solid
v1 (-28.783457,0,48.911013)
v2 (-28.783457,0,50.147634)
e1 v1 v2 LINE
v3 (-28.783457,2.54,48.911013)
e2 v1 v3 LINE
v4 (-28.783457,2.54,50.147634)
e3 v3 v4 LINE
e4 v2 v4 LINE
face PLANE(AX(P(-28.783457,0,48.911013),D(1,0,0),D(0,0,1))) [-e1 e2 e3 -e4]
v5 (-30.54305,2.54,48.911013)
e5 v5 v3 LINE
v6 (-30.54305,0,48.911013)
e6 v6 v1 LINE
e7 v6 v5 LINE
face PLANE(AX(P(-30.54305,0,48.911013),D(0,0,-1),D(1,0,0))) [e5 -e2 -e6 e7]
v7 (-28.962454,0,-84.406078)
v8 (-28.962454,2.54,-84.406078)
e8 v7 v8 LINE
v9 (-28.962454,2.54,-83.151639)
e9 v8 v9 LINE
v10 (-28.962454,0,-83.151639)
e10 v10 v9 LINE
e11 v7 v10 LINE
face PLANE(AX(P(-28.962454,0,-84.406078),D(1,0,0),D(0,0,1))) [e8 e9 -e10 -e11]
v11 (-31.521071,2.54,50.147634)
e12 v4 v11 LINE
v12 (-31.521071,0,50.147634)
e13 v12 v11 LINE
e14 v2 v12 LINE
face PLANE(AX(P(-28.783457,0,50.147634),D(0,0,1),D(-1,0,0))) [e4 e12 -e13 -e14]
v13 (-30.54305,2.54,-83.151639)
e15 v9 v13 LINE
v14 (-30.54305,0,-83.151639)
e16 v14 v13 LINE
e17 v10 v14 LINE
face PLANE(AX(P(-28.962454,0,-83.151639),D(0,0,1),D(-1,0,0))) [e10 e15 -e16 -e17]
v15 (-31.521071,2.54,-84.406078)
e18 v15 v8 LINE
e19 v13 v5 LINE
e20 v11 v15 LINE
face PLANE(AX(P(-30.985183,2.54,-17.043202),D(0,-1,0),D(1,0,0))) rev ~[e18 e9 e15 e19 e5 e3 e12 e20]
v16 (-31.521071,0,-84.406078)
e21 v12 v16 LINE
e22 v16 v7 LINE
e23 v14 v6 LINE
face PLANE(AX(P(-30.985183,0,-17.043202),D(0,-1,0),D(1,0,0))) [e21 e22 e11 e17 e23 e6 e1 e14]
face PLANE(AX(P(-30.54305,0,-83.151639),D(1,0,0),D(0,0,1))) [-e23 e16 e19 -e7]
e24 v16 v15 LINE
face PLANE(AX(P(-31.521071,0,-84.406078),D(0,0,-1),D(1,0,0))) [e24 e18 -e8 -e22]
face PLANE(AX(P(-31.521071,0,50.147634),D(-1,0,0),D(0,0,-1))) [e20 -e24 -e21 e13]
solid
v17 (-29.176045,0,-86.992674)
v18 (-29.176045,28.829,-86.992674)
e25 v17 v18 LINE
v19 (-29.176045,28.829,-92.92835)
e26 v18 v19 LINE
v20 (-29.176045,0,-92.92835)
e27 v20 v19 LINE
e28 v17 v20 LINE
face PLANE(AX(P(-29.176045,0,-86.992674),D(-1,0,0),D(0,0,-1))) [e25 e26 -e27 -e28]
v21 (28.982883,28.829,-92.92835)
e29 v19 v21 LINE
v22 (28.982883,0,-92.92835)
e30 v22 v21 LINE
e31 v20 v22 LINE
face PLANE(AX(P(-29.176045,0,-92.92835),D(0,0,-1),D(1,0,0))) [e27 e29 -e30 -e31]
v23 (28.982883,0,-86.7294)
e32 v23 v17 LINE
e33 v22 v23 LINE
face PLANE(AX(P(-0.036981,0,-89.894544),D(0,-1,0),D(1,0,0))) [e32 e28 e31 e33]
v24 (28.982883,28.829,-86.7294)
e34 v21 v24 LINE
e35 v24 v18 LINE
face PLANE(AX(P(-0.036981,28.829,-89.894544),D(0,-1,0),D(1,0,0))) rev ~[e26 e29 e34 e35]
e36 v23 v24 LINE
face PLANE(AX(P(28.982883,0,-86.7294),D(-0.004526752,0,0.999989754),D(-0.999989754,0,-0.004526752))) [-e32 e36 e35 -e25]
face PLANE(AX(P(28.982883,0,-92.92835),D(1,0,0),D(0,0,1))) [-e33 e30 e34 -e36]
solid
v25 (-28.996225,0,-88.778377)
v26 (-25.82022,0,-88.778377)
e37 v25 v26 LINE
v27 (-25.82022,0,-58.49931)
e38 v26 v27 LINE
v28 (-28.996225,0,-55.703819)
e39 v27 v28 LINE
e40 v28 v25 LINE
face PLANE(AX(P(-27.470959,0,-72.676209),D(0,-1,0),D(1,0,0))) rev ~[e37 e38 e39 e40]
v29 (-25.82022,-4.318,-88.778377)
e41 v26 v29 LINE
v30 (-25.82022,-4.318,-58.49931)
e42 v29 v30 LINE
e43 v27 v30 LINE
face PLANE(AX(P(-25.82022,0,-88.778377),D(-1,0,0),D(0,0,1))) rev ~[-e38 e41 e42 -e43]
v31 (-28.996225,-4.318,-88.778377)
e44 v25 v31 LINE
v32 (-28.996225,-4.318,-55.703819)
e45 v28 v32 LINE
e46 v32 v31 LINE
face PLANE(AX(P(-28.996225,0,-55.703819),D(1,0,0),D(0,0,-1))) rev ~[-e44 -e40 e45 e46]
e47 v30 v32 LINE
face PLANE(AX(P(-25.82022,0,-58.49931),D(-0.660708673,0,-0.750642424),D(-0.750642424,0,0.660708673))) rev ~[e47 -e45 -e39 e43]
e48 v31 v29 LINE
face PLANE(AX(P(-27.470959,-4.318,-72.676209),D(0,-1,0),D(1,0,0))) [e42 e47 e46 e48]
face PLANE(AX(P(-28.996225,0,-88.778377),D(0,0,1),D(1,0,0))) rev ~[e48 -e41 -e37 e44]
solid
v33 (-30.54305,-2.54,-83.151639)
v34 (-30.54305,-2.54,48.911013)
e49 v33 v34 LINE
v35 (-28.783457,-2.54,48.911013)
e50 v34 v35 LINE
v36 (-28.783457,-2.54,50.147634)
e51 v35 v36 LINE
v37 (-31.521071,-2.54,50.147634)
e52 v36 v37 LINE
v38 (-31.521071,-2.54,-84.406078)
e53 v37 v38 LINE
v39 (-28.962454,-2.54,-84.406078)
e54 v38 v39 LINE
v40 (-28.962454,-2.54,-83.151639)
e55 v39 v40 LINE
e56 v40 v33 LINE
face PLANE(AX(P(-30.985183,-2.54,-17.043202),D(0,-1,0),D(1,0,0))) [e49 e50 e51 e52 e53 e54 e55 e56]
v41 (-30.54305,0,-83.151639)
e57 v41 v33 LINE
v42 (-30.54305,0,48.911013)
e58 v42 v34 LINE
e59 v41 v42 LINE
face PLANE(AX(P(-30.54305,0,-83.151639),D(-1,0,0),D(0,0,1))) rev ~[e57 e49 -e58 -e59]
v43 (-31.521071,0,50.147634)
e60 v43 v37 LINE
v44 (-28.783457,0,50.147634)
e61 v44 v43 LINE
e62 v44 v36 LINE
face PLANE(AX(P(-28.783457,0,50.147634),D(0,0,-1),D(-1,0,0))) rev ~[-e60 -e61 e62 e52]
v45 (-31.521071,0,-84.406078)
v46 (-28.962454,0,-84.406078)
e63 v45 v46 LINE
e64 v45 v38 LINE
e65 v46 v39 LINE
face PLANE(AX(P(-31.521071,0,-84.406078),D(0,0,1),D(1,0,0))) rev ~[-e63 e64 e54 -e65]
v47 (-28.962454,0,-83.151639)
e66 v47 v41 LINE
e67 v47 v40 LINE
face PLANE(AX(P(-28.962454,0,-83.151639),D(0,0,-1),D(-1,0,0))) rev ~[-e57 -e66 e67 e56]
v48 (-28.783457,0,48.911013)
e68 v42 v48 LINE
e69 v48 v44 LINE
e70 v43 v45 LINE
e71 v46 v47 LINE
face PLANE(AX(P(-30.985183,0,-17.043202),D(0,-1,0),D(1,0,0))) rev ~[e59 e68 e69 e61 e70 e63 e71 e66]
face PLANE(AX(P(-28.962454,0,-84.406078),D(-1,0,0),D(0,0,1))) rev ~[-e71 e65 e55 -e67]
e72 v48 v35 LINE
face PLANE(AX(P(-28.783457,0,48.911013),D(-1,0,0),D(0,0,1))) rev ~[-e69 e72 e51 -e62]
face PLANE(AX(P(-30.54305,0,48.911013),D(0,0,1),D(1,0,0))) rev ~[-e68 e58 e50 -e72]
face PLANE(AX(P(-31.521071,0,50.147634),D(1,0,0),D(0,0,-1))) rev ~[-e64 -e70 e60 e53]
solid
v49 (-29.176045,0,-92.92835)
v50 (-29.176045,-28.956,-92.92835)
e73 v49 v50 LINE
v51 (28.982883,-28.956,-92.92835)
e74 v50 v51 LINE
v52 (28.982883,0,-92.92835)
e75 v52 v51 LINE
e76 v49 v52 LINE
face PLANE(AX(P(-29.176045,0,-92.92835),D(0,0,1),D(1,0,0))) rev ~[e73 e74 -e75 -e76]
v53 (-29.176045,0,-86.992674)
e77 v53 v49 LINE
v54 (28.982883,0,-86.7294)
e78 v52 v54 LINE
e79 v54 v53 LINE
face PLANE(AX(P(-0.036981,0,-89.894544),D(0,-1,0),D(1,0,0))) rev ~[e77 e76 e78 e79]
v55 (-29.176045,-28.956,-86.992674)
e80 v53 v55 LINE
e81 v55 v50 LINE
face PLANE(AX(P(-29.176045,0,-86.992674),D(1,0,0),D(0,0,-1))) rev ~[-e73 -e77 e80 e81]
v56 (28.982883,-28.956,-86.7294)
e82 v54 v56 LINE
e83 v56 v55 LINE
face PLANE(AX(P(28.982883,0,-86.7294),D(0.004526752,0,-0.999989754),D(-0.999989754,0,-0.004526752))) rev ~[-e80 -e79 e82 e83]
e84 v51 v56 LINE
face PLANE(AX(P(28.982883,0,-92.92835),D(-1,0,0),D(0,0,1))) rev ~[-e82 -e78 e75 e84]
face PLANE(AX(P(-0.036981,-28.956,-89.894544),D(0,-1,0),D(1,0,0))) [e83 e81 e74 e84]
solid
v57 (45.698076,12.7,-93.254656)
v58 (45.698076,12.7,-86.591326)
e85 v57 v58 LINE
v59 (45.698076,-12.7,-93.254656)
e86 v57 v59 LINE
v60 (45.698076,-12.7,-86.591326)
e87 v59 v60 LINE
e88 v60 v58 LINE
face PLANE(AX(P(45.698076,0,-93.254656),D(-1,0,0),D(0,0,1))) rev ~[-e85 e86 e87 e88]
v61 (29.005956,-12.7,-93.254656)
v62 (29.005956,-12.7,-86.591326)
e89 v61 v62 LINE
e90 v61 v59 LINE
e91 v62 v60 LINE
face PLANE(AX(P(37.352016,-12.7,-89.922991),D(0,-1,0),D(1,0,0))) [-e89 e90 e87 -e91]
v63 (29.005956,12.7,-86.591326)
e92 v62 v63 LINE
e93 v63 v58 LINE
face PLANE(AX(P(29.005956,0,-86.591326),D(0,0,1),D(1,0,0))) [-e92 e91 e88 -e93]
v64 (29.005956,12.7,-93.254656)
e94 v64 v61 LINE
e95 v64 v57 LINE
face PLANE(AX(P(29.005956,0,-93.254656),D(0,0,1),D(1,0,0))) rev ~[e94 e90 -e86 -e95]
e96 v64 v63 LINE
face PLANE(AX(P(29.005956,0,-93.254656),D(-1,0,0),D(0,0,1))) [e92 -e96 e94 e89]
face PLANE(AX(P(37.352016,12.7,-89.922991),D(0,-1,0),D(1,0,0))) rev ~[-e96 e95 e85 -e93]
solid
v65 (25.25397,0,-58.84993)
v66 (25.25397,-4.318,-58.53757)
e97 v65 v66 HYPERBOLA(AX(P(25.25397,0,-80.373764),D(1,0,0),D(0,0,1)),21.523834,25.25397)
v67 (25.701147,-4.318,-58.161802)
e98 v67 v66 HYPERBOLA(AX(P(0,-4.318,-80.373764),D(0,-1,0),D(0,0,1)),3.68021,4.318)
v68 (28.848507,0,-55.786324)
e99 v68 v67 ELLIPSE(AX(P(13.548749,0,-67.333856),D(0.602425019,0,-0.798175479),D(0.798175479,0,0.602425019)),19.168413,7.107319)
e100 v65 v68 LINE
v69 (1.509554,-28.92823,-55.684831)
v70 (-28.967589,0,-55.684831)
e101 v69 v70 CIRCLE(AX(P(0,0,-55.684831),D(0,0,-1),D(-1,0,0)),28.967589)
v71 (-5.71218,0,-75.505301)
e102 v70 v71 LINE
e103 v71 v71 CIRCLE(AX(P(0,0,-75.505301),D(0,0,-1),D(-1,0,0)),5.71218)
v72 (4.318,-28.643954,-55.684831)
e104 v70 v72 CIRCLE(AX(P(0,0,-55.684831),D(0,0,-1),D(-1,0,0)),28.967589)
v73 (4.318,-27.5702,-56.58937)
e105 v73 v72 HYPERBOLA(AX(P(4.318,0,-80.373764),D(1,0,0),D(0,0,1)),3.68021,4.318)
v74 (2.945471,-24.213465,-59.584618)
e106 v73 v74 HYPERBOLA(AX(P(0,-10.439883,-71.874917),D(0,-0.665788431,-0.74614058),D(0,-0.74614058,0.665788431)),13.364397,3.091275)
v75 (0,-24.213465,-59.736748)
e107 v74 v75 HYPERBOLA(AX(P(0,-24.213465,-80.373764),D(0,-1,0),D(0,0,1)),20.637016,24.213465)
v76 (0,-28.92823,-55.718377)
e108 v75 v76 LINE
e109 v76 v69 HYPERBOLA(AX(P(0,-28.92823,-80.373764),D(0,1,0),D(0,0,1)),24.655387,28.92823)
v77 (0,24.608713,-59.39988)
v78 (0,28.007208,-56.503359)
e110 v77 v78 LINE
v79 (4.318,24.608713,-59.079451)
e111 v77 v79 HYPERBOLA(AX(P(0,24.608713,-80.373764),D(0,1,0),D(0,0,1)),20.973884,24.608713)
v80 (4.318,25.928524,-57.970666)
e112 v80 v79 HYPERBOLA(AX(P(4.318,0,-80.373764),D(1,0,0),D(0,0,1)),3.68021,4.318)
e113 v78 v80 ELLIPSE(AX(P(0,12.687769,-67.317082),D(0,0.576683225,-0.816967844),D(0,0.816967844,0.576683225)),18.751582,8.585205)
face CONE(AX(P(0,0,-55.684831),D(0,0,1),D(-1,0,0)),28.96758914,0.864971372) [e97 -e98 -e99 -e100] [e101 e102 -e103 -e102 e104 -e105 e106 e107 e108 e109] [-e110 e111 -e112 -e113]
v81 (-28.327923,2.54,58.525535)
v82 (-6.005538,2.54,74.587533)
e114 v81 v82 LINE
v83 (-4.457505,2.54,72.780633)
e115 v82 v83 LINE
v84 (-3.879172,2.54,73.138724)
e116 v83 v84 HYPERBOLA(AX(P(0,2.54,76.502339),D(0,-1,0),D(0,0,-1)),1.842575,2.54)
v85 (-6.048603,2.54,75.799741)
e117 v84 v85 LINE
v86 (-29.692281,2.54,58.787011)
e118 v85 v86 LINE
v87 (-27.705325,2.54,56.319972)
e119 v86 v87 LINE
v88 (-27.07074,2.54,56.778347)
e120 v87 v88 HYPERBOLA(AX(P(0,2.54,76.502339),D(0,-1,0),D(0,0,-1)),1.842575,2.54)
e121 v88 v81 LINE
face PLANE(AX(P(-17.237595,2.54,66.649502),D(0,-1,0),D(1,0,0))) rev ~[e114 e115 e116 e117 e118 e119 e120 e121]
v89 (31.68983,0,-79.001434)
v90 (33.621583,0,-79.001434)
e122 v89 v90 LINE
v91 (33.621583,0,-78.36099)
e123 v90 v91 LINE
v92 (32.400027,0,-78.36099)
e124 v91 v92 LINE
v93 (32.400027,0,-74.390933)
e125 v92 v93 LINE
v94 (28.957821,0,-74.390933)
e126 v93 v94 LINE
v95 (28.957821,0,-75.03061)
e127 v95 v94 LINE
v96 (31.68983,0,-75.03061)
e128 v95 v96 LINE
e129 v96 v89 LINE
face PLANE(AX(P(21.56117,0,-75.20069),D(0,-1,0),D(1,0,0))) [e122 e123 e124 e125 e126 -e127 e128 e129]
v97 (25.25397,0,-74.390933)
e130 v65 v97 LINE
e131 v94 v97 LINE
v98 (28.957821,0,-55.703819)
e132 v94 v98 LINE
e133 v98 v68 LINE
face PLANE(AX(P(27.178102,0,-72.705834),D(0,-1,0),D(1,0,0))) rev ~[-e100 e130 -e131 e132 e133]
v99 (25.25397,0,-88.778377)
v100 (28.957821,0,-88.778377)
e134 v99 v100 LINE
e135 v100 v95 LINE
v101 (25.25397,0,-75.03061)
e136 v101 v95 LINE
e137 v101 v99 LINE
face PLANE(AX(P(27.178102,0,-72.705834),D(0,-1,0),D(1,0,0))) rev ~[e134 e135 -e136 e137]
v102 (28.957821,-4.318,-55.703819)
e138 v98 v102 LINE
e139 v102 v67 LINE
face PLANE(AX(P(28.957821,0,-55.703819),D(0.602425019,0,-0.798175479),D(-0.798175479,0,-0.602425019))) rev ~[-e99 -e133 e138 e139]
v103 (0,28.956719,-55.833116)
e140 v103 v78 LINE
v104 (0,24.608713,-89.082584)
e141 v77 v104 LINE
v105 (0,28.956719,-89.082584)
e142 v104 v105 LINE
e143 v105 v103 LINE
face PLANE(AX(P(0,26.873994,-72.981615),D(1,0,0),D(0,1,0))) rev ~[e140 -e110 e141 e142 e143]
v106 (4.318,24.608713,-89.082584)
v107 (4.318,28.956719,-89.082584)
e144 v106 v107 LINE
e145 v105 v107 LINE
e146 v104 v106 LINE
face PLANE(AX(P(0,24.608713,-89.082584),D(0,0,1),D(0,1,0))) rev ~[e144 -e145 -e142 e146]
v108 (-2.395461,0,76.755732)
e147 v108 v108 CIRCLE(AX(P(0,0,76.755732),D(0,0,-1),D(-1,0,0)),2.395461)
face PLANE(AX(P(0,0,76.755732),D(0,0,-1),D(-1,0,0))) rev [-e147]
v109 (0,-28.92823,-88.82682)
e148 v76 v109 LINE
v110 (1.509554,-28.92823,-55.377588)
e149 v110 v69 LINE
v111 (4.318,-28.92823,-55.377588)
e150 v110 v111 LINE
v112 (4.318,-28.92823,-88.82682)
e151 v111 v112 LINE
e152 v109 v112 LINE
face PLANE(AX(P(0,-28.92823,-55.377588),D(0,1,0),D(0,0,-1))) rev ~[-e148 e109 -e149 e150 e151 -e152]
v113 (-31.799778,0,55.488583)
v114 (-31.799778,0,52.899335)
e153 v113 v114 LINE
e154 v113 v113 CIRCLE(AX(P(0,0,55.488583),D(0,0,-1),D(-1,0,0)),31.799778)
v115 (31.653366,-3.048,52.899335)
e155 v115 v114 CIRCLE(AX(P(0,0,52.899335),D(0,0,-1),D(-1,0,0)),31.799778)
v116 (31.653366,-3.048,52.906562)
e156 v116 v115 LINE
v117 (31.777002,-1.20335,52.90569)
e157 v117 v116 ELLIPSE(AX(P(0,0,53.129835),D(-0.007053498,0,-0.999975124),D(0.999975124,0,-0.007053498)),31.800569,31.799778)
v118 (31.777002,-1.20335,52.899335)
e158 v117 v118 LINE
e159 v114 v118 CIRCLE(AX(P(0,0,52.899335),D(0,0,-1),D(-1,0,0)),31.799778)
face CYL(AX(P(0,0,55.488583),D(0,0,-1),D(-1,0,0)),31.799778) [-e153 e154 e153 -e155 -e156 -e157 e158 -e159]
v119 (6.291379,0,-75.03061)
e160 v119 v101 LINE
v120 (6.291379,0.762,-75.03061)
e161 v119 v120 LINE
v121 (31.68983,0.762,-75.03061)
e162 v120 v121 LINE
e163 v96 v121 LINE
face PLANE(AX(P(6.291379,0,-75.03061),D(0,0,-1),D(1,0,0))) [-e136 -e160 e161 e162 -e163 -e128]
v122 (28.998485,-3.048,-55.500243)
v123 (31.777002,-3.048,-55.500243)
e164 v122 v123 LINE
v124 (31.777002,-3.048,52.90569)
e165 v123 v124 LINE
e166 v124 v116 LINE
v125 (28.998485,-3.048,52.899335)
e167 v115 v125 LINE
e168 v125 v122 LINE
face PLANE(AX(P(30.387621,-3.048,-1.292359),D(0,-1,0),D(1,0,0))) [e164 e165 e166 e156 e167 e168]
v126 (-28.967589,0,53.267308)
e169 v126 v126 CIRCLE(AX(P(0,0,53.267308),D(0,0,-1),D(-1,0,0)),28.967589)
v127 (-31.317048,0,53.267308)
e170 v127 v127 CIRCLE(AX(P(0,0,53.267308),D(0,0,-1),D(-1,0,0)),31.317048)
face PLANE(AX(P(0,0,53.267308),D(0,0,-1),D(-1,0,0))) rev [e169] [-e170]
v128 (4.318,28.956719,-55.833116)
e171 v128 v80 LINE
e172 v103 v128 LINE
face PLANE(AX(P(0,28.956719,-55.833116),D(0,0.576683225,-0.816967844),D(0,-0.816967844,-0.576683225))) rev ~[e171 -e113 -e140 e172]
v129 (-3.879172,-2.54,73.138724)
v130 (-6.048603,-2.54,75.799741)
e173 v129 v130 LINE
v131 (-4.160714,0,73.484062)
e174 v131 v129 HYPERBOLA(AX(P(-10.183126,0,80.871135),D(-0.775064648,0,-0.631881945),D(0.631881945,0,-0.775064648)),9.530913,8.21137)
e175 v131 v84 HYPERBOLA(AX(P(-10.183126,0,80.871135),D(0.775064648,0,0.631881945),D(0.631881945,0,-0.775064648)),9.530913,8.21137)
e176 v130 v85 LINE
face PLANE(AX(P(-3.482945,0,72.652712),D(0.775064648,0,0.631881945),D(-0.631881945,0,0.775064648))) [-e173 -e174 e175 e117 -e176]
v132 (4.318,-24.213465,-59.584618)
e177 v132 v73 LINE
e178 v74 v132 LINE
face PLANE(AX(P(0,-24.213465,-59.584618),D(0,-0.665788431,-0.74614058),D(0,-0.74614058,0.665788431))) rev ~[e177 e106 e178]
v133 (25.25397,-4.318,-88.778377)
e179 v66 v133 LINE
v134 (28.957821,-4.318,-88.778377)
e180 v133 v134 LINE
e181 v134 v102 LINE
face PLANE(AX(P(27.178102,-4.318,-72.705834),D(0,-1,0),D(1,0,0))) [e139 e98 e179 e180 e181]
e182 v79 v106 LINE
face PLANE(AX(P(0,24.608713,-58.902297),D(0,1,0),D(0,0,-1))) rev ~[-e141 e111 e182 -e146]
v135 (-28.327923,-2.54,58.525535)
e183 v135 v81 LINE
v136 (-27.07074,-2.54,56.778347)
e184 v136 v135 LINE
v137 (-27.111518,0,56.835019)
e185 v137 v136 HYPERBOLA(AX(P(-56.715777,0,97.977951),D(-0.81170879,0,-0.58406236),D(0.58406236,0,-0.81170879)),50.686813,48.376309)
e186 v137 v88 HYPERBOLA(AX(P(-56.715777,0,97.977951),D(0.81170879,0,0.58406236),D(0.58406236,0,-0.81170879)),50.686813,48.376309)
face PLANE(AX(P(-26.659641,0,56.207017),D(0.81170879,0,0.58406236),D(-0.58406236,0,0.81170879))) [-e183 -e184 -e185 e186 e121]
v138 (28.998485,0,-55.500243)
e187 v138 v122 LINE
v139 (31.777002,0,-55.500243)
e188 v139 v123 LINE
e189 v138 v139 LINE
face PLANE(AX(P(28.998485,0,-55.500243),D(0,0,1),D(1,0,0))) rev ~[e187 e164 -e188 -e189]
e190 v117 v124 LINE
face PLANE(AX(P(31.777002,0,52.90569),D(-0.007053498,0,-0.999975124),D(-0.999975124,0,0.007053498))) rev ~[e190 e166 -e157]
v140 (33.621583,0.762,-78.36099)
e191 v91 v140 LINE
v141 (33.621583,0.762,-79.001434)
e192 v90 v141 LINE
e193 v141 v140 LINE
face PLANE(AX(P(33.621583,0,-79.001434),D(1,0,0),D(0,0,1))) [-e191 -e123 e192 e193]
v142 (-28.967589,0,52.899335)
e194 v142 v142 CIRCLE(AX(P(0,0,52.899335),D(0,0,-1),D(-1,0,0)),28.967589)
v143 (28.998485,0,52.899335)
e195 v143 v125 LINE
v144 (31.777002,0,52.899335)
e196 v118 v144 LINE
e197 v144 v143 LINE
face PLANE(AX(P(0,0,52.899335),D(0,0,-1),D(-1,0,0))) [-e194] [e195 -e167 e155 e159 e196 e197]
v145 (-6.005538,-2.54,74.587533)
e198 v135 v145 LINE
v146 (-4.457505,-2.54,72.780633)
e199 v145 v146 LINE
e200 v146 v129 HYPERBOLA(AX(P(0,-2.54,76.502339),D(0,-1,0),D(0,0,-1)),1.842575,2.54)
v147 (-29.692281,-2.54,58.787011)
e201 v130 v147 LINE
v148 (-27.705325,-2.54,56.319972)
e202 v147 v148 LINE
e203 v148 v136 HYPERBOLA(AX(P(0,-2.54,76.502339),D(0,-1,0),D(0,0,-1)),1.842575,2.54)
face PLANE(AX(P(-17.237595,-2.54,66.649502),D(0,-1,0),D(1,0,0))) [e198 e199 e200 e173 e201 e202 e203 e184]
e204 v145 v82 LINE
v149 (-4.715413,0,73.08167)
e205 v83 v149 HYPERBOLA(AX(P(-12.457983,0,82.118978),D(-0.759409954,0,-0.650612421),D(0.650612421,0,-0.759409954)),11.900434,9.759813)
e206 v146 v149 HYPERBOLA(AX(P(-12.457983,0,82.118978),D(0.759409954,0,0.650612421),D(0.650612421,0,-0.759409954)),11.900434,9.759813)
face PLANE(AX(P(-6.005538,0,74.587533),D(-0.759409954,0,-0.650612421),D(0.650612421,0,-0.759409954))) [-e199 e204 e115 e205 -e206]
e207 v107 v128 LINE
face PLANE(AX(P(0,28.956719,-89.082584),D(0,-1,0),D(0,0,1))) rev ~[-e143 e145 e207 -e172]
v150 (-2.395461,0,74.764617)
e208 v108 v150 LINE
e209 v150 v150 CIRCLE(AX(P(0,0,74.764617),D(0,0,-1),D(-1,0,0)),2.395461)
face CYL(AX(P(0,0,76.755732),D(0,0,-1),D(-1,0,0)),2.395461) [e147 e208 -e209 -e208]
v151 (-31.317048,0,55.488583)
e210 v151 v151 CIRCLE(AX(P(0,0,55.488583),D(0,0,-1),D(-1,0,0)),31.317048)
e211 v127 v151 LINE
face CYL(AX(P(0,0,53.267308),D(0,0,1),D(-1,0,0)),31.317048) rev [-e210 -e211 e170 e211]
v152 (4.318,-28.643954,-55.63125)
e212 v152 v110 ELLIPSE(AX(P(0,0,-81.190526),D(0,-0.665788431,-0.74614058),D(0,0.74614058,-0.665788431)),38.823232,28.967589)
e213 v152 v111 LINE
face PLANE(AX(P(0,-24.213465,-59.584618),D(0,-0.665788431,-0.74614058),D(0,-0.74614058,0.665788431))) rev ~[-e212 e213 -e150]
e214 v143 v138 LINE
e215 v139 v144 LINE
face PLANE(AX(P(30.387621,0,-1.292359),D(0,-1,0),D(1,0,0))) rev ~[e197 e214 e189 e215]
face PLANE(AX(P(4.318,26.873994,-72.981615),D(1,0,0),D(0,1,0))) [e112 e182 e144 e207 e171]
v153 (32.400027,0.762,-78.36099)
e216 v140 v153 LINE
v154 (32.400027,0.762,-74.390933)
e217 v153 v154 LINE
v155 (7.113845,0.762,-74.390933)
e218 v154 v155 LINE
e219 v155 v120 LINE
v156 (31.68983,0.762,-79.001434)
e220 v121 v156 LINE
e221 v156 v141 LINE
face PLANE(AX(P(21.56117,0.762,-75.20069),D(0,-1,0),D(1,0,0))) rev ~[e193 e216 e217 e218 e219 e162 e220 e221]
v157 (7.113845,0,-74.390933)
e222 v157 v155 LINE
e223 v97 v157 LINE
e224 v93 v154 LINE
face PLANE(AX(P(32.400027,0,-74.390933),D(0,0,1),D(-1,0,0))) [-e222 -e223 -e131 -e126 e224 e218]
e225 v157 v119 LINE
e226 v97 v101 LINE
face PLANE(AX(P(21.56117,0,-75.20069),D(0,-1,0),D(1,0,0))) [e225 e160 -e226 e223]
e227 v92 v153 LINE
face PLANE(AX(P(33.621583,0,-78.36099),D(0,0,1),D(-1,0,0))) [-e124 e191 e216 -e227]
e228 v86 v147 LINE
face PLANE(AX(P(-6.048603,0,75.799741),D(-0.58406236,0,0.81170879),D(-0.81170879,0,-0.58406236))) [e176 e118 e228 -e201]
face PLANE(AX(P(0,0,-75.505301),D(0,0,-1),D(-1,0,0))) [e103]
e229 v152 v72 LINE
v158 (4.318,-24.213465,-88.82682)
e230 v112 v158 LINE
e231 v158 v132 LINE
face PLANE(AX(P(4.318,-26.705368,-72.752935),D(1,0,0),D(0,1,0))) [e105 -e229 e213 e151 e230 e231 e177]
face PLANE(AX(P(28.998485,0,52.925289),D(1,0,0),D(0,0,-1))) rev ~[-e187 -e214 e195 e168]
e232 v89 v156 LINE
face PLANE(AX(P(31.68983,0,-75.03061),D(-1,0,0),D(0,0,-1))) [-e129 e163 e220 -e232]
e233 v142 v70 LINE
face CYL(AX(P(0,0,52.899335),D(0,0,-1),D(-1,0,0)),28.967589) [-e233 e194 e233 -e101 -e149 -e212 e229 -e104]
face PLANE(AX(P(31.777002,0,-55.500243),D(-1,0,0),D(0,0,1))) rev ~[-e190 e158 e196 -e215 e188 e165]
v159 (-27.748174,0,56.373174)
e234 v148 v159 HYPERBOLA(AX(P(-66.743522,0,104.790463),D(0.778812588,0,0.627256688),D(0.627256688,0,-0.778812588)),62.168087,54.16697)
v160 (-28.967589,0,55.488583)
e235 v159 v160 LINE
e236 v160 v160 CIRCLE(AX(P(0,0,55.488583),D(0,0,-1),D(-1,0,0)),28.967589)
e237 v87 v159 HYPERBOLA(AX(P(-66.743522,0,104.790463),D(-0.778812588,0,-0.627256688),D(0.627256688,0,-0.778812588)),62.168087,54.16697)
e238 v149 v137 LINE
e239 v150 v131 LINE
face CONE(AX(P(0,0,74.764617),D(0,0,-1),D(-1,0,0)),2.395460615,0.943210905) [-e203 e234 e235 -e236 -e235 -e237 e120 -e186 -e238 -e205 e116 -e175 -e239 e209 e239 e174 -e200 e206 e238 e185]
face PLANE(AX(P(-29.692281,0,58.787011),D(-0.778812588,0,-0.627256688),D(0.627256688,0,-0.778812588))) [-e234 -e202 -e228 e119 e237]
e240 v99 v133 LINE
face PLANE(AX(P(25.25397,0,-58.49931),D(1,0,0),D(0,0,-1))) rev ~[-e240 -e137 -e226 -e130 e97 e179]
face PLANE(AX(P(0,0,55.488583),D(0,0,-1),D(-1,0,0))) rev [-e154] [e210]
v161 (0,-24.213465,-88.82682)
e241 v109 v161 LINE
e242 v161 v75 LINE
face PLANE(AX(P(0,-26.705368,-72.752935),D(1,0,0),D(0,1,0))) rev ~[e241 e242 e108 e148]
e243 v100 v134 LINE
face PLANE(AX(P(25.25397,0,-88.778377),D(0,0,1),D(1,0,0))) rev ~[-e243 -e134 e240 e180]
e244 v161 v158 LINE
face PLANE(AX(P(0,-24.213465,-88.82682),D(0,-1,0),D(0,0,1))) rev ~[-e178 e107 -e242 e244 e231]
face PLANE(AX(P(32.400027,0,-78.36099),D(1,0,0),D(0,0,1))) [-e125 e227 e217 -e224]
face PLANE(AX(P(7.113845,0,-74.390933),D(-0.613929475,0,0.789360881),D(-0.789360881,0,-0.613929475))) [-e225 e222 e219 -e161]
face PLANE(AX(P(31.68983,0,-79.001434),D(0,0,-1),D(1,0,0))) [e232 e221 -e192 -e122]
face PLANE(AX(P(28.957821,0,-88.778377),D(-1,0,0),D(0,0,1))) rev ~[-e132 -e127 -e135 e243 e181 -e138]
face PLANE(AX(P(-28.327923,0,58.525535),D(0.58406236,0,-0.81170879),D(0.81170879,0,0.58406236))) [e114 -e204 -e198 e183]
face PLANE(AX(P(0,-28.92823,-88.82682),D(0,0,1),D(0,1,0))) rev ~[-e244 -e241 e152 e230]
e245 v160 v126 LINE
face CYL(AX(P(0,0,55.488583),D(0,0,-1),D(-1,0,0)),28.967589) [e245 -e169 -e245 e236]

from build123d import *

# Parameters (mm, degrees)
F3_DEPTH  = 3.048
F5_DEPTH  = 4.318
F7_DEPTH  = 4.318
F9_DEPTH  = 0.762
F11_DEPTH = 28.829
F12_DEPTH = 28.956
F13_W     = 16.6921205819
F13_H     = 6.6633298993
F14_DEPTH = 12.7
F15_DEPTH = 12.7
F19_DEPTH = 2.54
F21_DEPTH = 2.54
F22_DEPTH = 5.08
F23_DEPTH = 2.54


# Not quite as in the source:
# - the program builds the solid bodies; features that only make, move or delete a surface that nothing else refers to are left out


with BuildPart() as f1:
    # F0 (on Front) → F1 (revolve)
    with BuildSketch(Plane.XZ):
        Polygon((-2.3954606149, 74.7646167874), (-28.9675891399, 55.4885827005), (-28.9675891399, 53.2673075795), (-31.3170477748, 53.2673075795), (-31.3170477748, 55.4885827005), (-31.7997783422, 55.4885827005), (-31.7997783422, 52.8993345797), (-28.9675891399, 52.8993345797), (-28.9675891399, -55.6848309934), (-5.7121798845, -75.5053013563), (0, -75.5053013563), (0, 76.7557322979), (-2.3954606149, 76.7557322979), align=None)
    revolve(axis=Axis((0, 0, 0.6252154708), (0, 0, -1)))

    # F2 (on Front) → F3 (join)
    with BuildSketch(Plane.XZ):
        Polygon((31.7770019174, -55.5002428591), (31.7770019174, 52.905689925), (28.998484835, 52.9252886772), (28.998484835, -55.5002428591), align=None)
    extrude(amount=F3_DEPTH)

    # F4 (on Front) → F5 (join)
    with BuildSketch(Plane.XZ):
        Polygon((28.9578214288, -88.7783765793), (28.9578214288, -55.7038187981), (25.253970176, -58.4993101656), (25.253970176, -88.7783765793), align=None)
    extrude(amount=F5_DEPTH)

    # F6 (on Right) → F7 (join)
    with BuildSketch(Plane.YZ):
        Polygon((-24.2134649307, -59.5846176147), (-28.9282295853, -55.377587676), (-28.9282295853, -88.8268202543), (-24.8995702714, -88.8268202543), (-24.2134649307, -88.8268202543), align=None)
        Polygon((28.9567187428, -89.0825837851), (28.9567187428, -55.8331161737), (24.6087126434, -58.902297169), (24.6087126434, -89.0825837851), align=None)
    extrude(amount=F7_DEPTH)

    # F8 (on Front) → F9 (join)
    with BuildSketch(Plane.XZ):
        Polygon((6.2913792208, -75.0306099653), (6.6843754612, -75.0306099653), (31.6898301244, -75.0306099653), (31.6898301244, -79.0014341474), (33.6215831339, -79.0014341474), (33.6215831339, -78.3609896898), (32.4000269175, -78.3609896898), (32.4000269175, -74.3909329176), (7.1138450876, -74.3909329176), align=None)
    extrude(amount=-F9_DEPTH)

    # F20 (on Front) → F21 (join)
    with BuildSketch(Plane.XZ):
        Polygon((-6.0486025177, 75.7997408509), (-29.6922810376, 58.7870106101), (-27.2098183632, 55.7047426701), (-26.6596407538, 56.2070166686), (-28.3279228477, 58.5255349164), (-6.0055375566, 74.587533009), (-3.9922085164, 72.2375285146), (-3.4829450306, 72.6527124643), align=None)
    extrude(amount=-F21_DEPTH)

    # F22 (add): a face of the model
    f22_faces = [f1.faces().sort_by_distance(p)[0] for p in [
        (-17.4845819472, 2.54, 66.7374198953),
    ]]
    extrude(f22_faces, amount=-F22_DEPTH)


with BuildPart() as f5:
    # F4 (on Front) → F5, piece 2 (new body)
    with BuildSketch(Plane.XZ):
        Polygon((-25.8202198893, -58.4993101656), (-28.9962254465, -55.7038187981), (-28.9962254465, -88.7783765793), (-25.8202198893, -88.7783765793), align=None)
    extrude(amount=F5_DEPTH)


with BuildPart() as f11:
    # F10 (on Front) → F11 (new body)
    with BuildSketch(Plane.XZ):
        Polygon((28.9828833193, -86.7293998599), (-29.1760452092, -86.9926735759), (-29.1760452092, -92.9283499718), (28.9828833193, -92.9283499718), align=None)
    extrude(amount=-F11_DEPTH)


with BuildPart() as f12:
    # F12 (new): a face of the model
    f12_faces = [f11.part.faces().sort_by_distance(p)[0] for p in [
        (0.113722427, 0, -89.8942173444),
    ]]
    extrude(f12_faces, amount=F12_DEPTH)


with BuildPart() as f14:
    # F13 (on Front) → F14 (new body)
    with BuildSketch(Plane.XZ):
        with Locations((37.3520161957, -89.9229906499)):
            Rectangle(F13_W, F13_H)
    extrude(amount=-F14_DEPTH)

    # F15 (add): a face of the model
    f15_faces = [f14.faces().sort_by_distance(p)[0] for p in [
        (37.3520161957, 0, -89.9229906499),
    ]]
    extrude(f15_faces, amount=F15_DEPTH)


with BuildPart() as f19:
    # F18 (on Front) → F19 (new body)
    with BuildSketch(Plane.XZ):
        Polygon((-31.5210707486, -84.4060778618), (-28.9624538273, -84.4060778618), (-28.9624538273, -83.1516385078), (-30.5430497974, -83.1516385078), (-30.5430497974, 48.9110127091), (-28.7834573537, 48.9110127091), (-28.7834573537, 50.1476339996), (-31.5210707486, 50.1476339996), align=None)
    extrude(amount=F19_DEPTH)


with BuildPart() as f23:
    # F23 (new): a face of the model
    f23_faces = [f19.part.faces().sort_by_distance(p)[0] for p in [
        (-30.9914355027, 0, -17.034232655),
    ]]
    extrude(f23_faces, amount=F23_DEPTH)


solid = Compound([f1.part, f5.part, f11.part, f12.part, f14.part, f19.part, f23.part])
